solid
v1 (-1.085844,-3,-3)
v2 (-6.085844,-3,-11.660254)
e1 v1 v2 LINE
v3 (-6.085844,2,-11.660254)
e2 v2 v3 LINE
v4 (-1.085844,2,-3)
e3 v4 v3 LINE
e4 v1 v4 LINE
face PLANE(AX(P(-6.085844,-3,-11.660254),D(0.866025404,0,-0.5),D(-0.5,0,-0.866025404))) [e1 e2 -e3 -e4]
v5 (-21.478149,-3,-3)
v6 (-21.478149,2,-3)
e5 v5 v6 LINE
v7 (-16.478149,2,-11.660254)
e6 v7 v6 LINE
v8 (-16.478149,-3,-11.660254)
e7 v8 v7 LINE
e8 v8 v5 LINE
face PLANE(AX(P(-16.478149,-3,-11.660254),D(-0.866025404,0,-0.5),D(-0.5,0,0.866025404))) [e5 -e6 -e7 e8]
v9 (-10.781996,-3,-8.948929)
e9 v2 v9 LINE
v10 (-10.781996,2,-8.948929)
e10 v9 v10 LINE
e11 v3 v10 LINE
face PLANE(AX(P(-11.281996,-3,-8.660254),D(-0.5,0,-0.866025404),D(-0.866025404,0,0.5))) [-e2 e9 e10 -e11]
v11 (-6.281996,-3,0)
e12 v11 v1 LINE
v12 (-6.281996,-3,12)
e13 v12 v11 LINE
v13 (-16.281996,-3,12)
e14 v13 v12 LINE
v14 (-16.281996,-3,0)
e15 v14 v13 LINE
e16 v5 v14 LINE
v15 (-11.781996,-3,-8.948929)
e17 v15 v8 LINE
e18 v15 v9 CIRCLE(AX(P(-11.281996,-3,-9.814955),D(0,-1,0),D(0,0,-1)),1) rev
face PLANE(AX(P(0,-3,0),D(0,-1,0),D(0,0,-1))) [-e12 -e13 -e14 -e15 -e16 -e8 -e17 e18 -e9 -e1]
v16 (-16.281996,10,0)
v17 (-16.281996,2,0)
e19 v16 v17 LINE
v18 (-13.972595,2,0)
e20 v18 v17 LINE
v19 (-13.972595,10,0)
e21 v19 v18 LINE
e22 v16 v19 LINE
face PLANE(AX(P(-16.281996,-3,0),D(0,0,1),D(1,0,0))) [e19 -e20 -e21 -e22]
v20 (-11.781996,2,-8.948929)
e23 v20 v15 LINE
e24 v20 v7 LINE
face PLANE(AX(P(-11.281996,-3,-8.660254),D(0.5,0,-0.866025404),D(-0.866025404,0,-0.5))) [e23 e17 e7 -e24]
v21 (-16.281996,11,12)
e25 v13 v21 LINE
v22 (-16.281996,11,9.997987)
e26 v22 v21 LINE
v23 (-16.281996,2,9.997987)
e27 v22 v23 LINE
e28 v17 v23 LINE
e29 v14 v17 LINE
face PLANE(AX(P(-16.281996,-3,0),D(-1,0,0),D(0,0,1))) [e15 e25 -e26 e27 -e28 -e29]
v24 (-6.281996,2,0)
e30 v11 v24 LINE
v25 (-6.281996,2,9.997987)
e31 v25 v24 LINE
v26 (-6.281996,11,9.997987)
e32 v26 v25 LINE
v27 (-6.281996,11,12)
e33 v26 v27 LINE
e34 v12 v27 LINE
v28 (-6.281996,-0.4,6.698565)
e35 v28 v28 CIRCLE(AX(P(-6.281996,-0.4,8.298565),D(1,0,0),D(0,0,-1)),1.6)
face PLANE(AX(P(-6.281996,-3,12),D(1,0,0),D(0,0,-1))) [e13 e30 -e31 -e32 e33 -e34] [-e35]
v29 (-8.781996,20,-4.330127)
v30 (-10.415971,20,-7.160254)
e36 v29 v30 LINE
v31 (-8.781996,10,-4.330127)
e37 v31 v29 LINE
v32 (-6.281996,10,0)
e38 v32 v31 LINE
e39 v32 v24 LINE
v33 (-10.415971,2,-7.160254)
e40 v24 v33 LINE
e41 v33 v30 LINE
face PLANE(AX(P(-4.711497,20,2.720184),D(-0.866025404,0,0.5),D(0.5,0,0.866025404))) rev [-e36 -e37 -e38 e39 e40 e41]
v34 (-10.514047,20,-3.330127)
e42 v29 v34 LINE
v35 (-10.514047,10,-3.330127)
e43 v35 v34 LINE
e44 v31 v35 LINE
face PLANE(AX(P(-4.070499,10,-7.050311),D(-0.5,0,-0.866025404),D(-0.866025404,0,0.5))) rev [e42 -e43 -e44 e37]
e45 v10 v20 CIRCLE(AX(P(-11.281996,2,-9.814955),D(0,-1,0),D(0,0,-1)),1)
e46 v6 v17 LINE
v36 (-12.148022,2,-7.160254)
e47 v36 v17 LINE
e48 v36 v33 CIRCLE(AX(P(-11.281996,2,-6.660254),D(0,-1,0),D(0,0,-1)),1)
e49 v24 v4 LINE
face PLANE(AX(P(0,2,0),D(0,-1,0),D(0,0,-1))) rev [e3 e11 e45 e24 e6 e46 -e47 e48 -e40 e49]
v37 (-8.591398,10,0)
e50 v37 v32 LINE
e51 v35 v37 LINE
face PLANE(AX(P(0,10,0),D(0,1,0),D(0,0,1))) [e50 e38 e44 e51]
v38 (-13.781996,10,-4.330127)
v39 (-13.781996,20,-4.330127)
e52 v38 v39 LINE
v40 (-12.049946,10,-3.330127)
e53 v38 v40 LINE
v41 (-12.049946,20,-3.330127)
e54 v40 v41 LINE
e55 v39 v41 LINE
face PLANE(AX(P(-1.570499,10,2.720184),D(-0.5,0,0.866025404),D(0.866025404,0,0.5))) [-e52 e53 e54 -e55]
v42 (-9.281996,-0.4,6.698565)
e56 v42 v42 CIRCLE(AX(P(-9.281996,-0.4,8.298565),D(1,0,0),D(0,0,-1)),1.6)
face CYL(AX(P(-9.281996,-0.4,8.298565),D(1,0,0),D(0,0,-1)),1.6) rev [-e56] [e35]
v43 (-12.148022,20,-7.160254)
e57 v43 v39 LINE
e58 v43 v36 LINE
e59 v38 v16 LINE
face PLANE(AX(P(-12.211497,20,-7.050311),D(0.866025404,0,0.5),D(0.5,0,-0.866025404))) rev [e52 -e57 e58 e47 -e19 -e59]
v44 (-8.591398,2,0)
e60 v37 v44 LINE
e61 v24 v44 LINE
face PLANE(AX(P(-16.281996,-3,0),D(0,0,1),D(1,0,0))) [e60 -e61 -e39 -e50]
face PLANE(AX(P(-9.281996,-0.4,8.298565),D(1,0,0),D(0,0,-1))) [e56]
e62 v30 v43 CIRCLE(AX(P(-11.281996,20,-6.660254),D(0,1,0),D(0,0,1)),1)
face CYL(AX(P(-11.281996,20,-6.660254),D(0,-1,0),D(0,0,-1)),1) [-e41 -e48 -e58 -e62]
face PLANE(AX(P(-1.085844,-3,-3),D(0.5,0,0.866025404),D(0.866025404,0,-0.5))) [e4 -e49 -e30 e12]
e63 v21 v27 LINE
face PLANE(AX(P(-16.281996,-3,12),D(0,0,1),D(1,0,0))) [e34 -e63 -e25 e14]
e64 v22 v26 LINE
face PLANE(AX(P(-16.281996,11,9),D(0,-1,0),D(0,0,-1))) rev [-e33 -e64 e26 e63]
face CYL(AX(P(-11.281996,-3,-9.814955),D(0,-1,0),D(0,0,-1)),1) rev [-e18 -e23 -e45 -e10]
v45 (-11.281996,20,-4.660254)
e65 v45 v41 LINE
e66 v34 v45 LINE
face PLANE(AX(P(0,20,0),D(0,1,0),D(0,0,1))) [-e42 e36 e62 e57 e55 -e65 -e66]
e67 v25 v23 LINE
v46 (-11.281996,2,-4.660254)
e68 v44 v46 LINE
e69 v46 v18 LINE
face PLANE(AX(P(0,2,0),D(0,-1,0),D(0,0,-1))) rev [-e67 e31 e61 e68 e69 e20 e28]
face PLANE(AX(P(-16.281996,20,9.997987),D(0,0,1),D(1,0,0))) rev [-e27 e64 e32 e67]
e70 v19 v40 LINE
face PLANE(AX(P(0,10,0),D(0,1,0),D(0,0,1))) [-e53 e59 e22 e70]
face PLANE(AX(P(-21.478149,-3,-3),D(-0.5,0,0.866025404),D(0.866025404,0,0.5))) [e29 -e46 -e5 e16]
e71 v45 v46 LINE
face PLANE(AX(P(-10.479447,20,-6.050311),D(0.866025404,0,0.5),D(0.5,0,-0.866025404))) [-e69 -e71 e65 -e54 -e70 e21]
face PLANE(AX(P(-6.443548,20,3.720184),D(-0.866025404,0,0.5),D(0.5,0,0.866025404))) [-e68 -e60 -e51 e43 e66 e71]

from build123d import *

# Parameters (mm, degrees)
BOSS_EXTRUDE1_DEPTH      = 2
BOSS_EXTRUDE1_DEPTH_BACK = 3
BOSS_EXTRUDE2_DEPTH      = 18
BOSS_EXTRUDE3_DEPTH      = 2
BOSS_EXTRUDE3_DEPTH_BACK = 3
SKETCH8_W                = 10
SKETCH8_H                = 12
SKETCH9_W                = 10
SKETCH9_H                = 2.002012711
BOSS_EXTRUDE4_DEPTH      = 18
CUT_EXTRUDE1_DEPTH       = 10
SKETCH12_W               = 10
SKETCH12_H               = 9
CUT_EXTRUDE3_DEPTH       = 3
FILLET3_R                = 1
FILLET4_R                = 1
SKETCH14_R               = 1.6
CUT_EXTRUDE4_DEPTH       = 3


with BuildPart() as part:
    # Sketch3 → Boss-Extrude1 (new, two sides: drawn at the far end of the back side and taken through both)
    with BuildSketch(Plane(origin=(0, 0, 0), x_dir=(1, 0, 0), z_dir=(0, 1, 0)).offset(-BOSS_EXTRUDE1_DEPTH_BACK)):
        Polygon((-16.281996431, 0), (-6.281996431, 0), (-1.085844009, 3), (-6.085844009, 11.660254038), (-11.281996431, 8.660254038), (-16.478148854, 11.660254038), (-21.478148854, 3), align=None)
    extrude(amount=BOSS_EXTRUDE1_DEPTH + BOSS_EXTRUDE1_DEPTH_BACK)

    # Sketch7 → Boss-Extrude2 (add)
    with BuildSketch(Plane(origin=(0, 2, 0), x_dir=(1, 0, 0), z_dir=(0, 1, 0))):
        Polygon((-6.281996431, 0), (-11.281996431, 8.660254038), (-16.281996431, 0), (-13.972595355, 0), (-12.817894816, 2), (-11.281996431, 4.660254038), (-9.746098047, 2), (-8.591397508, 0), align=None)
    extrude(amount=BOSS_EXTRUDE2_DEPTH)

    # Sketch8 → Boss-Extrude3 (add, two sides: drawn at the far end of the back side and taken through both)
    with BuildSketch(Plane(origin=(0, 0, 0), x_dir=(1, 0, 0), z_dir=(0, 1, 0)).offset(-BOSS_EXTRUDE3_DEPTH_BACK)):
        with Locations((-11.281996431, -6)):
            Rectangle(SKETCH8_W, SKETCH8_H)
    extrude(amount=BOSS_EXTRUDE3_DEPTH + BOSS_EXTRUDE3_DEPTH_BACK)

    # Sketch9 → Boss-Extrude4 (add)
    with BuildSketch(Plane(origin=(0, 2, 0), x_dir=(1, 0, 0), z_dir=(0, 1, 0))):
        with Locations((-11.281996431, -10.998993645)):
            Rectangle(SKETCH9_W, SKETCH9_H)
    extrude(amount=BOSS_EXTRUDE4_DEPTH)

    # Sketch10 → Cut-Extrude1 (cut)
    with BuildSketch(Plane(origin=(0, 20, 0), x_dir=(1, 0, 0), z_dir=(0, 1, 0))):
        Polygon((-13.781996431, 4.330127019), (-16.281996431, 0), (-13.972595355, 0), (-12.049945624, 3.330127019), align=None)
        Polygon((-6.281996431, 0), (-8.781996431, 4.330127019), (-10.514047239, 3.330127019), (-8.591397508, 0), align=None)
    extrude(amount=-CUT_EXTRUDE1_DEPTH, mode=Mode.SUBTRACT)

    # Sketch12 → Cut-Extrude3 (cut)
    with BuildSketch(Plane.XY.offset(12)):
        with Locations((-11.281996431, 15.5)):
            Rectangle(SKETCH12_W, SKETCH12_H)
    extrude(amount=-CUT_EXTRUDE3_DEPTH, mode=Mode.SUBTRACT)

    # Fillet3
    # the kernel refuses this fillet: 1 mm, written as the material it takes off along each edge
    with BuildSketch(Plane(origin=(-11.281996431, 2, -8.660254038), x_dir=(-0.5000000000000031, 0, 0.8660254037844368), z_dir=(0, 1, 0))) as fillet3_piece_1:
        with BuildLine():
            CenterArc((FILLET3_R * 1.73205080757, FILLET3_R), FILLET3_R, 150, 120)
            Line((FILLET3_R * 0.866025403784, FILLET3_R * 1.5), (0, 0))
            Line((0, 0), (FILLET3_R * 1.73205080757, 0))
        make_face()
    extrude(amount=22.330127019, mode=Mode.SUBTRACT)

    # Fillet4
    fillet4_edges = [part.edges().sort_by_distance(p)[0] for p in [
        (-11.281996431, -0.5, -8.660254038),
    ]]
    fillet(fillet4_edges, radius=FILLET4_R)

    # Sketch14 → Cut-Extrude4 (cut)
    with BuildSketch(Plane(origin=(-6.281996431, 0, 0), x_dir=(0, 0, -1), z_dir=(1, 0, 0))):
        with Locations((-8.29856454, -0.4)):
            Circle(SKETCH14_R)
    extrude(amount=-CUT_EXTRUDE4_DEPTH, mode=Mode.SUBTRACT)


solid = part.part
